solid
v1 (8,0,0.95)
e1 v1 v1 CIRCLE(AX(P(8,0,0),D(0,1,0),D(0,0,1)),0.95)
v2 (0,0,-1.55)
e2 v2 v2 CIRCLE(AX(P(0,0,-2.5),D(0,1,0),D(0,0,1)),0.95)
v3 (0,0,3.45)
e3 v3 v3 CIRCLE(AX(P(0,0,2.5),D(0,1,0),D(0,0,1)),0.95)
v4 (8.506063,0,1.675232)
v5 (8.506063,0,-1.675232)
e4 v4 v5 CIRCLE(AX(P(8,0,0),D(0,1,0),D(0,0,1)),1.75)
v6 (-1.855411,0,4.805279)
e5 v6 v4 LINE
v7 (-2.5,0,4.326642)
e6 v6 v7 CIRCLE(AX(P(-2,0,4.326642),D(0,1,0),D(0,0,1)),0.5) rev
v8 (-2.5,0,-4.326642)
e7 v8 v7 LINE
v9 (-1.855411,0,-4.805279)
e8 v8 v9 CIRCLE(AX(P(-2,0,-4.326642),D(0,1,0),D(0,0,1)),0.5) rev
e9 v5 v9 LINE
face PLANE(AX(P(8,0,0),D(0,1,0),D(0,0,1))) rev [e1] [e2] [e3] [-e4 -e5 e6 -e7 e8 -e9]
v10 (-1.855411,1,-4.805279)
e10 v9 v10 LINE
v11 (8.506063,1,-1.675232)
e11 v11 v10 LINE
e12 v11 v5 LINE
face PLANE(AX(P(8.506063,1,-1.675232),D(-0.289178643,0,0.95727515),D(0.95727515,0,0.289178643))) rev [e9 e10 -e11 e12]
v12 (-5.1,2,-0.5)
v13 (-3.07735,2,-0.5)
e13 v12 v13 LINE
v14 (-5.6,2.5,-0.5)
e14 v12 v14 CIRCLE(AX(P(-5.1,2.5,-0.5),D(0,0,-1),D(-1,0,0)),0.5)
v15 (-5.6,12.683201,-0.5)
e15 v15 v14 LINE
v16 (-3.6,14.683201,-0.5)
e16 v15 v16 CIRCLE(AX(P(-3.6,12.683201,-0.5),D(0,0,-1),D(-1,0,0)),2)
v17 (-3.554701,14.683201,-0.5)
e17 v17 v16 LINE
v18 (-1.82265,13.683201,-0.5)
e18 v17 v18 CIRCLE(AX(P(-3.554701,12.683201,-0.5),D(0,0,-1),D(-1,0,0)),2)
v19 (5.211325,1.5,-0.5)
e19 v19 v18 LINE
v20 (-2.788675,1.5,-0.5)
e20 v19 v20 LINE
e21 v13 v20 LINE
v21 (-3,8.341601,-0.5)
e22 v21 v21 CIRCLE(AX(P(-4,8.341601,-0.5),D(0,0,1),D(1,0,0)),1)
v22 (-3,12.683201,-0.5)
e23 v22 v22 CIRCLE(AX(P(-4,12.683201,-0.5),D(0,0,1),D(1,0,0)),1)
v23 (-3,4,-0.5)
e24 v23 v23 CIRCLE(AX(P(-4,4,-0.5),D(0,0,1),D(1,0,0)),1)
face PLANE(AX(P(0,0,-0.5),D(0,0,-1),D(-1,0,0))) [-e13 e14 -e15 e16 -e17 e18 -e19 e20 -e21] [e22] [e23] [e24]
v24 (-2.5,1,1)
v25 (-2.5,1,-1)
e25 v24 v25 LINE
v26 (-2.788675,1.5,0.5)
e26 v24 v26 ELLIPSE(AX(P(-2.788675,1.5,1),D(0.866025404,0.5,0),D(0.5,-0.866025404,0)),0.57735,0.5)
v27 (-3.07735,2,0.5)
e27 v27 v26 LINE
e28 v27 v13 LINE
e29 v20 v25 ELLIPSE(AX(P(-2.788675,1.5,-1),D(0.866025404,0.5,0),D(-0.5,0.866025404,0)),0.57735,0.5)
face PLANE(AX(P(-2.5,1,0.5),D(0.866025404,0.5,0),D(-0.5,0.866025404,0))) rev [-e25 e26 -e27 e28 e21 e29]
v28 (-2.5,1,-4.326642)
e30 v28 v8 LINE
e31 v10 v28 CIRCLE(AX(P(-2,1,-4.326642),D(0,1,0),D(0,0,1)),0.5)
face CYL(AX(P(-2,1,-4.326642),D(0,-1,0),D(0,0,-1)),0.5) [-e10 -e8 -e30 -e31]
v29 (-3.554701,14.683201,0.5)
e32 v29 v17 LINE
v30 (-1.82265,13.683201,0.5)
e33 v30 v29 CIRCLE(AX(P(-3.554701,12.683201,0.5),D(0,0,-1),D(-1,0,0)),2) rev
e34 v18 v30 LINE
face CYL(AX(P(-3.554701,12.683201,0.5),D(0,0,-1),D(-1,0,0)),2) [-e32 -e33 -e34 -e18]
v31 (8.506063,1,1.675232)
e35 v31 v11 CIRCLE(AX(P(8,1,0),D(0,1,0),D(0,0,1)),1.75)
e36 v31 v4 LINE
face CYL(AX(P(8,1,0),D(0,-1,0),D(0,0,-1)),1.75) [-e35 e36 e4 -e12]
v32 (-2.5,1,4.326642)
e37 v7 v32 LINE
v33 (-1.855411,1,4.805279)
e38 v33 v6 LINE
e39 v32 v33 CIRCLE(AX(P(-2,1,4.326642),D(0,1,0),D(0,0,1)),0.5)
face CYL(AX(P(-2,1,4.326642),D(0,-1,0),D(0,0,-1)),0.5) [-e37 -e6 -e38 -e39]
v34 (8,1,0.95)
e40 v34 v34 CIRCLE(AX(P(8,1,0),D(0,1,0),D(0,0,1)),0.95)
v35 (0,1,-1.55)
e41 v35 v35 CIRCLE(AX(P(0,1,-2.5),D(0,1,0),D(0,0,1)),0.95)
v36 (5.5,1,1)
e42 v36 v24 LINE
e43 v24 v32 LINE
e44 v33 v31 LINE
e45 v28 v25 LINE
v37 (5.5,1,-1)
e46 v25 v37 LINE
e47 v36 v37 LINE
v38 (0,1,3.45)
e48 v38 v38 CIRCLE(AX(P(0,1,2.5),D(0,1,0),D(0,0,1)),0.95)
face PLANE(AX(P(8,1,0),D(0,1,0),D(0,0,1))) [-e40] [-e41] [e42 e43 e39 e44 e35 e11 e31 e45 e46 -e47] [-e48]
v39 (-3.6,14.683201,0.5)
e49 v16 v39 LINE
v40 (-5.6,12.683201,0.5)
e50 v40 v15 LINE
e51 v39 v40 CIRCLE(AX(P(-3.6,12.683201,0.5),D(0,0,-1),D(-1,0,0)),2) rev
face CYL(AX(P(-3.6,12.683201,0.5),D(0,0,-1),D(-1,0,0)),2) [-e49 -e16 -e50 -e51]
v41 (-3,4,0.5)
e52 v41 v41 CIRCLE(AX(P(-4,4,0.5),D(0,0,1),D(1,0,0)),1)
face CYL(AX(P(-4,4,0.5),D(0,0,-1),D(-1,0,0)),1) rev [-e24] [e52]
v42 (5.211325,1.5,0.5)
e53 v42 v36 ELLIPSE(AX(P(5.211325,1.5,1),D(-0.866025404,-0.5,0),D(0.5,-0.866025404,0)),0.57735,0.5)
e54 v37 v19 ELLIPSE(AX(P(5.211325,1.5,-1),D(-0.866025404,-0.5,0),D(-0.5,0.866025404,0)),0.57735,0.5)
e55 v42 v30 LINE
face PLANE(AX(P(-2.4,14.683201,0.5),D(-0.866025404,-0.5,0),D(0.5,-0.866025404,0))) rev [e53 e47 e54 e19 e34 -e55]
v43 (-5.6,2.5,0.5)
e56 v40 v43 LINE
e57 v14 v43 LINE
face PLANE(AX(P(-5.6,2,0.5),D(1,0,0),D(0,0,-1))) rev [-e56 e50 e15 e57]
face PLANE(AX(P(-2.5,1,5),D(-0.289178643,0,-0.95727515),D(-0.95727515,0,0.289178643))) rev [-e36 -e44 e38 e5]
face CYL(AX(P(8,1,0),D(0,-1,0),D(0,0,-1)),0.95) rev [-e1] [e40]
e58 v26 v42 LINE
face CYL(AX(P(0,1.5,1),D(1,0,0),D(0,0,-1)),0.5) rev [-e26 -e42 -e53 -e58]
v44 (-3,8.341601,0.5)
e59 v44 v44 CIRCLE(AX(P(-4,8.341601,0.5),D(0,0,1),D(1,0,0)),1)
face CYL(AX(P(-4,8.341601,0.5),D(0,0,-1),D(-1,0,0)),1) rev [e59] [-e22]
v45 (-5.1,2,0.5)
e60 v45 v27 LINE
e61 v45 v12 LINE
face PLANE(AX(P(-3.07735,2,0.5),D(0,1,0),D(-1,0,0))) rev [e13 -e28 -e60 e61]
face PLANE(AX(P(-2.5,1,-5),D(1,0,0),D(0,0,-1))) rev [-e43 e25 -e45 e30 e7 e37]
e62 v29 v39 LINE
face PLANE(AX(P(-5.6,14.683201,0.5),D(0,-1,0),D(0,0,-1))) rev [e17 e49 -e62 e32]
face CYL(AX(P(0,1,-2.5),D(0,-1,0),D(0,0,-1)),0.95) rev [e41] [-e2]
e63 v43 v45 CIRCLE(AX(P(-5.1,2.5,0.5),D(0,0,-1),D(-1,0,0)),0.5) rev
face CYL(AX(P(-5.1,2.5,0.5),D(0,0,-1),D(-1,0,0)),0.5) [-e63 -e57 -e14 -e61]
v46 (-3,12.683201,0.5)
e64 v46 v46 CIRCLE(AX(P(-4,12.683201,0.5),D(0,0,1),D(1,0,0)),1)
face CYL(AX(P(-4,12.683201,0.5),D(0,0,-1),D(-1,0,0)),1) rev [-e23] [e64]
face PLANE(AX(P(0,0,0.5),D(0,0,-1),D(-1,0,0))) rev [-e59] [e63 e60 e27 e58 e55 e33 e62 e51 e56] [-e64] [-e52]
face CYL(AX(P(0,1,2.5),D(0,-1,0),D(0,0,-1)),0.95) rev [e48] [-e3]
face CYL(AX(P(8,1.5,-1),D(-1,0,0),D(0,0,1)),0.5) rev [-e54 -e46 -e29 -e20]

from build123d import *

# Parameters (mm, degrees)
IZIM1_R                     = 0.95
Y_KSEKLIK_EKSTR_ZYON1_DEPTH = 1
RADYUS1_R                   = 0.5
IZIM2_R                     = 1
Y_KSEKLIK_EKSTR_ZYON2_DEPTH = 0.5
RADYUS2_R                   = 0.5
RADYUS3_R                   = 2


with BuildPart() as part:
    # Çizim1 → Yükseklik-Ekstrüzyon1 (new body)
    with BuildSketch(Plane(origin=(0, 0, 0), x_dir=(1, 0, 0), z_dir=(0, 1, 0))):
        with BuildLine():
            Line((-2.5, 5), (-2.5, -5))
            Line((-2.5, -5), (8.506062625, -1.675231512))
            ThreePointArc((8.506062625, -1.675231512), (9.75, 0), (8.506062625, 1.675231512))
            Line((8.506062625, 1.675231512), (-2.5, 5))
        make_face()
        with Locations(Location((0, 2.5, 0), (0, 0, 270))):
            Circle(IZIM1_R, mode=Mode.SUBTRACT)
        with Locations(Location((0, -2.5, 0), (0, 0, 270))):
            Circle(IZIM1_R, mode=Mode.SUBTRACT)
        with Locations(Location((8, 0, 0), (0, 0, 270))):
            Circle(IZIM1_R, mode=Mode.SUBTRACT)
    extrude(amount=Y_KSEKLIK_EKSTR_ZYON1_DEPTH)

    # Radyus1
    radyus1_edges = [part.edges().sort_by_distance(p)[0] for p in [
        (-2.5, 0.5, 5),
        (-2.5, 0.5, -5),
    ]]
    fillet(radyus1_edges, radius=RADYUS1_R)

    # Çizim2 → Yükseklik-Ekstrüzyon2 (add, symmetric)
    with BuildSketch(Plane.XY):
        Polygon((-2.5, 1), (-3.077350269, 2), (-5.6, 2), (-5.6, 14.68320138), (-2.4, 14.68320138), (5.5, 1), align=None)
        with Locations((-4, 4)):
            Circle(IZIM2_R, mode=Mode.SUBTRACT)
        with Locations((-4, 12.68320138)):
            Circle(IZIM2_R, mode=Mode.SUBTRACT)
        with Locations((-4, 8.34160069)):
            Circle(IZIM2_R, mode=Mode.SUBTRACT)
    extrude(amount=Y_KSEKLIK_EKSTR_ZYON2_DEPTH, both=True)

    # Radyus2
    # the kernel refuses this fillet: 0.5 mm, written as the material it adds along each edge
    with BuildSketch(Plane(origin=(6.75, 1, 0.5), x_dir=(0, 0, 1), z_dir=(-1, 0, 0))) as radyus2_piece_1_section:
        with BuildLine():
            CenterArc((RADYUS2_R, RADYUS2_R), RADYUS2_R, 180, 90)
            Line((0, RADYUS2_R), (0, 0))
            Line((0, 0), (RADYUS2_R, 0))
        make_face()
    radyus2_piece_1 = extrude(amount=9.25, mode=Mode.PRIVATE)
    radyus2_piece_1 = split(radyus2_piece_1, bisect_by=Plane(origin=(4.44326915, 2.830311522, 0.613693195), z_dir=(-0.8660254037844398, -0.49999999999999806, 0)), keep=Keep.TOP, mode=Mode.PRIVATE)
    radyus2_piece_1 = split(radyus2_piece_1, bisect_by=Plane(origin=(-1.55673085, -0.633790093, 0.613693195), z_dir=(0.8660254037844397, 0.4999999999999983, 0)), keep=Keep.TOP, mode=Mode.PRIVATE)
    add(radyus2_piece_1)
    with BuildSketch(Plane(origin=(6.75, 1, 0.5), x_dir=(0, 0, 1), z_dir=(-1, 0, 0))) as radyus2_piece_2_section:
        with BuildLine():
            CenterArc((RADYUS2_R, RADYUS2_R), RADYUS2_R, 180, 90)
            Line((0, RADYUS2_R), (0, 0))
            Line((0, 0), (RADYUS2_R, 0))
        make_face()
    radyus2_piece_2 = extrude(amount=10.5, mode=Mode.PRIVATE)
    radyus2_piece_2 = split(radyus2_piece_2, bisect_by=Plane(origin=(-2.5, 1.215059026, 0.553236256), z_dir=(-1, 0, 0)), keep=Keep.TOP, mode=Mode.PRIVATE)
    radyus2_piece_2 = split(radyus2_piece_2, bisect_by=Plane(origin=(-2.608643838, 1.188176648, 0.553236256), z_dir=(0.8660254037844397, 0.4999999999999983, 0)), keep=Keep.TOP, mode=Mode.PRIVATE)
    add(radyus2_piece_2)
    with BuildSketch(Plane(origin=(6.75, 1, -0.5), x_dir=(0, 0, -1), z_dir=(-1, 0, 0))) as radyus2_piece_3_section:
        with BuildLine():
            CenterArc((RADYUS2_R, -RADYUS2_R), RADYUS2_R, 90, 90)
            Line((0, -RADYUS2_R), (0, 0))
            Line((0, 0), (RADYUS2_R, 0))
        make_face()
    radyus2_piece_3 = extrude(amount=9.25, mode=Mode.PRIVATE)
    radyus2_piece_3 = split(radyus2_piece_3, bisect_by=Plane(origin=(4.44326915, 2.830311522, -0.613693195), z_dir=(-0.8660254037844398, -0.49999999999999806, 0)), keep=Keep.TOP, mode=Mode.PRIVATE)
    radyus2_piece_3 = split(radyus2_piece_3, bisect_by=Plane(origin=(-1.55673085, -0.633790093, -0.613693195), z_dir=(0.8660254037844397, 0.4999999999999983, 0)), keep=Keep.TOP, mode=Mode.PRIVATE)
    add(radyus2_piece_3)
    with BuildSketch(Plane(origin=(6.75, 1, -0.5), x_dir=(0, 0, -1), z_dir=(-1, 0, 0))) as radyus2_piece_4_section:
        with BuildLine():
            CenterArc((RADYUS2_R, -RADYUS2_R), RADYUS2_R, 90, 90)
            Line((0, -RADYUS2_R), (0, 0))
            Line((0, 0), (RADYUS2_R, 0))
        make_face()
    radyus2_piece_4 = extrude(amount=10.5, mode=Mode.PRIVATE)
    radyus2_piece_4 = split(radyus2_piece_4, bisect_by=Plane(origin=(-2.5, 1.215059026, -0.553236256), z_dir=(-1, 0, 0)), keep=Keep.TOP, mode=Mode.PRIVATE)
    radyus2_piece_4 = split(radyus2_piece_4, bisect_by=Plane(origin=(-2.608643838, 1.188176648, -0.553236256), z_dir=(0.8660254037844397, 0.4999999999999983, 0)), keep=Keep.TOP, mode=Mode.PRIVATE)
    add(radyus2_piece_4)
    # the kernel refuses this fillet: 0.5 mm, written as the material it takes off along each edge
    with BuildSketch(Plane(origin=(-5.6, 2, 1.75), x_dir=(0, 1, 0), z_dir=(0, 0, -1))) as radyus2_2_piece_1:
        with BuildLine():
            CenterArc((RADYUS2_R, RADYUS2_R), RADYUS2_R, 180, 90)
            Line((0, RADYUS2_R), (0, 0))
            Line((0, 0), (RADYUS2_R, 0))
        make_face()
    extrude(amount=3.5, mode=Mode.SUBTRACT)

    # Radyus3
    radyus3_edges = [part.edges().sort_by_distance(p)[0] for p in [
        (-5.6, 14.68320138, 0),
        (-2.4, 14.68320138, 0),
    ]]
    fillet(radyus3_edges, radius=RADYUS3_R)


solid = part.part
